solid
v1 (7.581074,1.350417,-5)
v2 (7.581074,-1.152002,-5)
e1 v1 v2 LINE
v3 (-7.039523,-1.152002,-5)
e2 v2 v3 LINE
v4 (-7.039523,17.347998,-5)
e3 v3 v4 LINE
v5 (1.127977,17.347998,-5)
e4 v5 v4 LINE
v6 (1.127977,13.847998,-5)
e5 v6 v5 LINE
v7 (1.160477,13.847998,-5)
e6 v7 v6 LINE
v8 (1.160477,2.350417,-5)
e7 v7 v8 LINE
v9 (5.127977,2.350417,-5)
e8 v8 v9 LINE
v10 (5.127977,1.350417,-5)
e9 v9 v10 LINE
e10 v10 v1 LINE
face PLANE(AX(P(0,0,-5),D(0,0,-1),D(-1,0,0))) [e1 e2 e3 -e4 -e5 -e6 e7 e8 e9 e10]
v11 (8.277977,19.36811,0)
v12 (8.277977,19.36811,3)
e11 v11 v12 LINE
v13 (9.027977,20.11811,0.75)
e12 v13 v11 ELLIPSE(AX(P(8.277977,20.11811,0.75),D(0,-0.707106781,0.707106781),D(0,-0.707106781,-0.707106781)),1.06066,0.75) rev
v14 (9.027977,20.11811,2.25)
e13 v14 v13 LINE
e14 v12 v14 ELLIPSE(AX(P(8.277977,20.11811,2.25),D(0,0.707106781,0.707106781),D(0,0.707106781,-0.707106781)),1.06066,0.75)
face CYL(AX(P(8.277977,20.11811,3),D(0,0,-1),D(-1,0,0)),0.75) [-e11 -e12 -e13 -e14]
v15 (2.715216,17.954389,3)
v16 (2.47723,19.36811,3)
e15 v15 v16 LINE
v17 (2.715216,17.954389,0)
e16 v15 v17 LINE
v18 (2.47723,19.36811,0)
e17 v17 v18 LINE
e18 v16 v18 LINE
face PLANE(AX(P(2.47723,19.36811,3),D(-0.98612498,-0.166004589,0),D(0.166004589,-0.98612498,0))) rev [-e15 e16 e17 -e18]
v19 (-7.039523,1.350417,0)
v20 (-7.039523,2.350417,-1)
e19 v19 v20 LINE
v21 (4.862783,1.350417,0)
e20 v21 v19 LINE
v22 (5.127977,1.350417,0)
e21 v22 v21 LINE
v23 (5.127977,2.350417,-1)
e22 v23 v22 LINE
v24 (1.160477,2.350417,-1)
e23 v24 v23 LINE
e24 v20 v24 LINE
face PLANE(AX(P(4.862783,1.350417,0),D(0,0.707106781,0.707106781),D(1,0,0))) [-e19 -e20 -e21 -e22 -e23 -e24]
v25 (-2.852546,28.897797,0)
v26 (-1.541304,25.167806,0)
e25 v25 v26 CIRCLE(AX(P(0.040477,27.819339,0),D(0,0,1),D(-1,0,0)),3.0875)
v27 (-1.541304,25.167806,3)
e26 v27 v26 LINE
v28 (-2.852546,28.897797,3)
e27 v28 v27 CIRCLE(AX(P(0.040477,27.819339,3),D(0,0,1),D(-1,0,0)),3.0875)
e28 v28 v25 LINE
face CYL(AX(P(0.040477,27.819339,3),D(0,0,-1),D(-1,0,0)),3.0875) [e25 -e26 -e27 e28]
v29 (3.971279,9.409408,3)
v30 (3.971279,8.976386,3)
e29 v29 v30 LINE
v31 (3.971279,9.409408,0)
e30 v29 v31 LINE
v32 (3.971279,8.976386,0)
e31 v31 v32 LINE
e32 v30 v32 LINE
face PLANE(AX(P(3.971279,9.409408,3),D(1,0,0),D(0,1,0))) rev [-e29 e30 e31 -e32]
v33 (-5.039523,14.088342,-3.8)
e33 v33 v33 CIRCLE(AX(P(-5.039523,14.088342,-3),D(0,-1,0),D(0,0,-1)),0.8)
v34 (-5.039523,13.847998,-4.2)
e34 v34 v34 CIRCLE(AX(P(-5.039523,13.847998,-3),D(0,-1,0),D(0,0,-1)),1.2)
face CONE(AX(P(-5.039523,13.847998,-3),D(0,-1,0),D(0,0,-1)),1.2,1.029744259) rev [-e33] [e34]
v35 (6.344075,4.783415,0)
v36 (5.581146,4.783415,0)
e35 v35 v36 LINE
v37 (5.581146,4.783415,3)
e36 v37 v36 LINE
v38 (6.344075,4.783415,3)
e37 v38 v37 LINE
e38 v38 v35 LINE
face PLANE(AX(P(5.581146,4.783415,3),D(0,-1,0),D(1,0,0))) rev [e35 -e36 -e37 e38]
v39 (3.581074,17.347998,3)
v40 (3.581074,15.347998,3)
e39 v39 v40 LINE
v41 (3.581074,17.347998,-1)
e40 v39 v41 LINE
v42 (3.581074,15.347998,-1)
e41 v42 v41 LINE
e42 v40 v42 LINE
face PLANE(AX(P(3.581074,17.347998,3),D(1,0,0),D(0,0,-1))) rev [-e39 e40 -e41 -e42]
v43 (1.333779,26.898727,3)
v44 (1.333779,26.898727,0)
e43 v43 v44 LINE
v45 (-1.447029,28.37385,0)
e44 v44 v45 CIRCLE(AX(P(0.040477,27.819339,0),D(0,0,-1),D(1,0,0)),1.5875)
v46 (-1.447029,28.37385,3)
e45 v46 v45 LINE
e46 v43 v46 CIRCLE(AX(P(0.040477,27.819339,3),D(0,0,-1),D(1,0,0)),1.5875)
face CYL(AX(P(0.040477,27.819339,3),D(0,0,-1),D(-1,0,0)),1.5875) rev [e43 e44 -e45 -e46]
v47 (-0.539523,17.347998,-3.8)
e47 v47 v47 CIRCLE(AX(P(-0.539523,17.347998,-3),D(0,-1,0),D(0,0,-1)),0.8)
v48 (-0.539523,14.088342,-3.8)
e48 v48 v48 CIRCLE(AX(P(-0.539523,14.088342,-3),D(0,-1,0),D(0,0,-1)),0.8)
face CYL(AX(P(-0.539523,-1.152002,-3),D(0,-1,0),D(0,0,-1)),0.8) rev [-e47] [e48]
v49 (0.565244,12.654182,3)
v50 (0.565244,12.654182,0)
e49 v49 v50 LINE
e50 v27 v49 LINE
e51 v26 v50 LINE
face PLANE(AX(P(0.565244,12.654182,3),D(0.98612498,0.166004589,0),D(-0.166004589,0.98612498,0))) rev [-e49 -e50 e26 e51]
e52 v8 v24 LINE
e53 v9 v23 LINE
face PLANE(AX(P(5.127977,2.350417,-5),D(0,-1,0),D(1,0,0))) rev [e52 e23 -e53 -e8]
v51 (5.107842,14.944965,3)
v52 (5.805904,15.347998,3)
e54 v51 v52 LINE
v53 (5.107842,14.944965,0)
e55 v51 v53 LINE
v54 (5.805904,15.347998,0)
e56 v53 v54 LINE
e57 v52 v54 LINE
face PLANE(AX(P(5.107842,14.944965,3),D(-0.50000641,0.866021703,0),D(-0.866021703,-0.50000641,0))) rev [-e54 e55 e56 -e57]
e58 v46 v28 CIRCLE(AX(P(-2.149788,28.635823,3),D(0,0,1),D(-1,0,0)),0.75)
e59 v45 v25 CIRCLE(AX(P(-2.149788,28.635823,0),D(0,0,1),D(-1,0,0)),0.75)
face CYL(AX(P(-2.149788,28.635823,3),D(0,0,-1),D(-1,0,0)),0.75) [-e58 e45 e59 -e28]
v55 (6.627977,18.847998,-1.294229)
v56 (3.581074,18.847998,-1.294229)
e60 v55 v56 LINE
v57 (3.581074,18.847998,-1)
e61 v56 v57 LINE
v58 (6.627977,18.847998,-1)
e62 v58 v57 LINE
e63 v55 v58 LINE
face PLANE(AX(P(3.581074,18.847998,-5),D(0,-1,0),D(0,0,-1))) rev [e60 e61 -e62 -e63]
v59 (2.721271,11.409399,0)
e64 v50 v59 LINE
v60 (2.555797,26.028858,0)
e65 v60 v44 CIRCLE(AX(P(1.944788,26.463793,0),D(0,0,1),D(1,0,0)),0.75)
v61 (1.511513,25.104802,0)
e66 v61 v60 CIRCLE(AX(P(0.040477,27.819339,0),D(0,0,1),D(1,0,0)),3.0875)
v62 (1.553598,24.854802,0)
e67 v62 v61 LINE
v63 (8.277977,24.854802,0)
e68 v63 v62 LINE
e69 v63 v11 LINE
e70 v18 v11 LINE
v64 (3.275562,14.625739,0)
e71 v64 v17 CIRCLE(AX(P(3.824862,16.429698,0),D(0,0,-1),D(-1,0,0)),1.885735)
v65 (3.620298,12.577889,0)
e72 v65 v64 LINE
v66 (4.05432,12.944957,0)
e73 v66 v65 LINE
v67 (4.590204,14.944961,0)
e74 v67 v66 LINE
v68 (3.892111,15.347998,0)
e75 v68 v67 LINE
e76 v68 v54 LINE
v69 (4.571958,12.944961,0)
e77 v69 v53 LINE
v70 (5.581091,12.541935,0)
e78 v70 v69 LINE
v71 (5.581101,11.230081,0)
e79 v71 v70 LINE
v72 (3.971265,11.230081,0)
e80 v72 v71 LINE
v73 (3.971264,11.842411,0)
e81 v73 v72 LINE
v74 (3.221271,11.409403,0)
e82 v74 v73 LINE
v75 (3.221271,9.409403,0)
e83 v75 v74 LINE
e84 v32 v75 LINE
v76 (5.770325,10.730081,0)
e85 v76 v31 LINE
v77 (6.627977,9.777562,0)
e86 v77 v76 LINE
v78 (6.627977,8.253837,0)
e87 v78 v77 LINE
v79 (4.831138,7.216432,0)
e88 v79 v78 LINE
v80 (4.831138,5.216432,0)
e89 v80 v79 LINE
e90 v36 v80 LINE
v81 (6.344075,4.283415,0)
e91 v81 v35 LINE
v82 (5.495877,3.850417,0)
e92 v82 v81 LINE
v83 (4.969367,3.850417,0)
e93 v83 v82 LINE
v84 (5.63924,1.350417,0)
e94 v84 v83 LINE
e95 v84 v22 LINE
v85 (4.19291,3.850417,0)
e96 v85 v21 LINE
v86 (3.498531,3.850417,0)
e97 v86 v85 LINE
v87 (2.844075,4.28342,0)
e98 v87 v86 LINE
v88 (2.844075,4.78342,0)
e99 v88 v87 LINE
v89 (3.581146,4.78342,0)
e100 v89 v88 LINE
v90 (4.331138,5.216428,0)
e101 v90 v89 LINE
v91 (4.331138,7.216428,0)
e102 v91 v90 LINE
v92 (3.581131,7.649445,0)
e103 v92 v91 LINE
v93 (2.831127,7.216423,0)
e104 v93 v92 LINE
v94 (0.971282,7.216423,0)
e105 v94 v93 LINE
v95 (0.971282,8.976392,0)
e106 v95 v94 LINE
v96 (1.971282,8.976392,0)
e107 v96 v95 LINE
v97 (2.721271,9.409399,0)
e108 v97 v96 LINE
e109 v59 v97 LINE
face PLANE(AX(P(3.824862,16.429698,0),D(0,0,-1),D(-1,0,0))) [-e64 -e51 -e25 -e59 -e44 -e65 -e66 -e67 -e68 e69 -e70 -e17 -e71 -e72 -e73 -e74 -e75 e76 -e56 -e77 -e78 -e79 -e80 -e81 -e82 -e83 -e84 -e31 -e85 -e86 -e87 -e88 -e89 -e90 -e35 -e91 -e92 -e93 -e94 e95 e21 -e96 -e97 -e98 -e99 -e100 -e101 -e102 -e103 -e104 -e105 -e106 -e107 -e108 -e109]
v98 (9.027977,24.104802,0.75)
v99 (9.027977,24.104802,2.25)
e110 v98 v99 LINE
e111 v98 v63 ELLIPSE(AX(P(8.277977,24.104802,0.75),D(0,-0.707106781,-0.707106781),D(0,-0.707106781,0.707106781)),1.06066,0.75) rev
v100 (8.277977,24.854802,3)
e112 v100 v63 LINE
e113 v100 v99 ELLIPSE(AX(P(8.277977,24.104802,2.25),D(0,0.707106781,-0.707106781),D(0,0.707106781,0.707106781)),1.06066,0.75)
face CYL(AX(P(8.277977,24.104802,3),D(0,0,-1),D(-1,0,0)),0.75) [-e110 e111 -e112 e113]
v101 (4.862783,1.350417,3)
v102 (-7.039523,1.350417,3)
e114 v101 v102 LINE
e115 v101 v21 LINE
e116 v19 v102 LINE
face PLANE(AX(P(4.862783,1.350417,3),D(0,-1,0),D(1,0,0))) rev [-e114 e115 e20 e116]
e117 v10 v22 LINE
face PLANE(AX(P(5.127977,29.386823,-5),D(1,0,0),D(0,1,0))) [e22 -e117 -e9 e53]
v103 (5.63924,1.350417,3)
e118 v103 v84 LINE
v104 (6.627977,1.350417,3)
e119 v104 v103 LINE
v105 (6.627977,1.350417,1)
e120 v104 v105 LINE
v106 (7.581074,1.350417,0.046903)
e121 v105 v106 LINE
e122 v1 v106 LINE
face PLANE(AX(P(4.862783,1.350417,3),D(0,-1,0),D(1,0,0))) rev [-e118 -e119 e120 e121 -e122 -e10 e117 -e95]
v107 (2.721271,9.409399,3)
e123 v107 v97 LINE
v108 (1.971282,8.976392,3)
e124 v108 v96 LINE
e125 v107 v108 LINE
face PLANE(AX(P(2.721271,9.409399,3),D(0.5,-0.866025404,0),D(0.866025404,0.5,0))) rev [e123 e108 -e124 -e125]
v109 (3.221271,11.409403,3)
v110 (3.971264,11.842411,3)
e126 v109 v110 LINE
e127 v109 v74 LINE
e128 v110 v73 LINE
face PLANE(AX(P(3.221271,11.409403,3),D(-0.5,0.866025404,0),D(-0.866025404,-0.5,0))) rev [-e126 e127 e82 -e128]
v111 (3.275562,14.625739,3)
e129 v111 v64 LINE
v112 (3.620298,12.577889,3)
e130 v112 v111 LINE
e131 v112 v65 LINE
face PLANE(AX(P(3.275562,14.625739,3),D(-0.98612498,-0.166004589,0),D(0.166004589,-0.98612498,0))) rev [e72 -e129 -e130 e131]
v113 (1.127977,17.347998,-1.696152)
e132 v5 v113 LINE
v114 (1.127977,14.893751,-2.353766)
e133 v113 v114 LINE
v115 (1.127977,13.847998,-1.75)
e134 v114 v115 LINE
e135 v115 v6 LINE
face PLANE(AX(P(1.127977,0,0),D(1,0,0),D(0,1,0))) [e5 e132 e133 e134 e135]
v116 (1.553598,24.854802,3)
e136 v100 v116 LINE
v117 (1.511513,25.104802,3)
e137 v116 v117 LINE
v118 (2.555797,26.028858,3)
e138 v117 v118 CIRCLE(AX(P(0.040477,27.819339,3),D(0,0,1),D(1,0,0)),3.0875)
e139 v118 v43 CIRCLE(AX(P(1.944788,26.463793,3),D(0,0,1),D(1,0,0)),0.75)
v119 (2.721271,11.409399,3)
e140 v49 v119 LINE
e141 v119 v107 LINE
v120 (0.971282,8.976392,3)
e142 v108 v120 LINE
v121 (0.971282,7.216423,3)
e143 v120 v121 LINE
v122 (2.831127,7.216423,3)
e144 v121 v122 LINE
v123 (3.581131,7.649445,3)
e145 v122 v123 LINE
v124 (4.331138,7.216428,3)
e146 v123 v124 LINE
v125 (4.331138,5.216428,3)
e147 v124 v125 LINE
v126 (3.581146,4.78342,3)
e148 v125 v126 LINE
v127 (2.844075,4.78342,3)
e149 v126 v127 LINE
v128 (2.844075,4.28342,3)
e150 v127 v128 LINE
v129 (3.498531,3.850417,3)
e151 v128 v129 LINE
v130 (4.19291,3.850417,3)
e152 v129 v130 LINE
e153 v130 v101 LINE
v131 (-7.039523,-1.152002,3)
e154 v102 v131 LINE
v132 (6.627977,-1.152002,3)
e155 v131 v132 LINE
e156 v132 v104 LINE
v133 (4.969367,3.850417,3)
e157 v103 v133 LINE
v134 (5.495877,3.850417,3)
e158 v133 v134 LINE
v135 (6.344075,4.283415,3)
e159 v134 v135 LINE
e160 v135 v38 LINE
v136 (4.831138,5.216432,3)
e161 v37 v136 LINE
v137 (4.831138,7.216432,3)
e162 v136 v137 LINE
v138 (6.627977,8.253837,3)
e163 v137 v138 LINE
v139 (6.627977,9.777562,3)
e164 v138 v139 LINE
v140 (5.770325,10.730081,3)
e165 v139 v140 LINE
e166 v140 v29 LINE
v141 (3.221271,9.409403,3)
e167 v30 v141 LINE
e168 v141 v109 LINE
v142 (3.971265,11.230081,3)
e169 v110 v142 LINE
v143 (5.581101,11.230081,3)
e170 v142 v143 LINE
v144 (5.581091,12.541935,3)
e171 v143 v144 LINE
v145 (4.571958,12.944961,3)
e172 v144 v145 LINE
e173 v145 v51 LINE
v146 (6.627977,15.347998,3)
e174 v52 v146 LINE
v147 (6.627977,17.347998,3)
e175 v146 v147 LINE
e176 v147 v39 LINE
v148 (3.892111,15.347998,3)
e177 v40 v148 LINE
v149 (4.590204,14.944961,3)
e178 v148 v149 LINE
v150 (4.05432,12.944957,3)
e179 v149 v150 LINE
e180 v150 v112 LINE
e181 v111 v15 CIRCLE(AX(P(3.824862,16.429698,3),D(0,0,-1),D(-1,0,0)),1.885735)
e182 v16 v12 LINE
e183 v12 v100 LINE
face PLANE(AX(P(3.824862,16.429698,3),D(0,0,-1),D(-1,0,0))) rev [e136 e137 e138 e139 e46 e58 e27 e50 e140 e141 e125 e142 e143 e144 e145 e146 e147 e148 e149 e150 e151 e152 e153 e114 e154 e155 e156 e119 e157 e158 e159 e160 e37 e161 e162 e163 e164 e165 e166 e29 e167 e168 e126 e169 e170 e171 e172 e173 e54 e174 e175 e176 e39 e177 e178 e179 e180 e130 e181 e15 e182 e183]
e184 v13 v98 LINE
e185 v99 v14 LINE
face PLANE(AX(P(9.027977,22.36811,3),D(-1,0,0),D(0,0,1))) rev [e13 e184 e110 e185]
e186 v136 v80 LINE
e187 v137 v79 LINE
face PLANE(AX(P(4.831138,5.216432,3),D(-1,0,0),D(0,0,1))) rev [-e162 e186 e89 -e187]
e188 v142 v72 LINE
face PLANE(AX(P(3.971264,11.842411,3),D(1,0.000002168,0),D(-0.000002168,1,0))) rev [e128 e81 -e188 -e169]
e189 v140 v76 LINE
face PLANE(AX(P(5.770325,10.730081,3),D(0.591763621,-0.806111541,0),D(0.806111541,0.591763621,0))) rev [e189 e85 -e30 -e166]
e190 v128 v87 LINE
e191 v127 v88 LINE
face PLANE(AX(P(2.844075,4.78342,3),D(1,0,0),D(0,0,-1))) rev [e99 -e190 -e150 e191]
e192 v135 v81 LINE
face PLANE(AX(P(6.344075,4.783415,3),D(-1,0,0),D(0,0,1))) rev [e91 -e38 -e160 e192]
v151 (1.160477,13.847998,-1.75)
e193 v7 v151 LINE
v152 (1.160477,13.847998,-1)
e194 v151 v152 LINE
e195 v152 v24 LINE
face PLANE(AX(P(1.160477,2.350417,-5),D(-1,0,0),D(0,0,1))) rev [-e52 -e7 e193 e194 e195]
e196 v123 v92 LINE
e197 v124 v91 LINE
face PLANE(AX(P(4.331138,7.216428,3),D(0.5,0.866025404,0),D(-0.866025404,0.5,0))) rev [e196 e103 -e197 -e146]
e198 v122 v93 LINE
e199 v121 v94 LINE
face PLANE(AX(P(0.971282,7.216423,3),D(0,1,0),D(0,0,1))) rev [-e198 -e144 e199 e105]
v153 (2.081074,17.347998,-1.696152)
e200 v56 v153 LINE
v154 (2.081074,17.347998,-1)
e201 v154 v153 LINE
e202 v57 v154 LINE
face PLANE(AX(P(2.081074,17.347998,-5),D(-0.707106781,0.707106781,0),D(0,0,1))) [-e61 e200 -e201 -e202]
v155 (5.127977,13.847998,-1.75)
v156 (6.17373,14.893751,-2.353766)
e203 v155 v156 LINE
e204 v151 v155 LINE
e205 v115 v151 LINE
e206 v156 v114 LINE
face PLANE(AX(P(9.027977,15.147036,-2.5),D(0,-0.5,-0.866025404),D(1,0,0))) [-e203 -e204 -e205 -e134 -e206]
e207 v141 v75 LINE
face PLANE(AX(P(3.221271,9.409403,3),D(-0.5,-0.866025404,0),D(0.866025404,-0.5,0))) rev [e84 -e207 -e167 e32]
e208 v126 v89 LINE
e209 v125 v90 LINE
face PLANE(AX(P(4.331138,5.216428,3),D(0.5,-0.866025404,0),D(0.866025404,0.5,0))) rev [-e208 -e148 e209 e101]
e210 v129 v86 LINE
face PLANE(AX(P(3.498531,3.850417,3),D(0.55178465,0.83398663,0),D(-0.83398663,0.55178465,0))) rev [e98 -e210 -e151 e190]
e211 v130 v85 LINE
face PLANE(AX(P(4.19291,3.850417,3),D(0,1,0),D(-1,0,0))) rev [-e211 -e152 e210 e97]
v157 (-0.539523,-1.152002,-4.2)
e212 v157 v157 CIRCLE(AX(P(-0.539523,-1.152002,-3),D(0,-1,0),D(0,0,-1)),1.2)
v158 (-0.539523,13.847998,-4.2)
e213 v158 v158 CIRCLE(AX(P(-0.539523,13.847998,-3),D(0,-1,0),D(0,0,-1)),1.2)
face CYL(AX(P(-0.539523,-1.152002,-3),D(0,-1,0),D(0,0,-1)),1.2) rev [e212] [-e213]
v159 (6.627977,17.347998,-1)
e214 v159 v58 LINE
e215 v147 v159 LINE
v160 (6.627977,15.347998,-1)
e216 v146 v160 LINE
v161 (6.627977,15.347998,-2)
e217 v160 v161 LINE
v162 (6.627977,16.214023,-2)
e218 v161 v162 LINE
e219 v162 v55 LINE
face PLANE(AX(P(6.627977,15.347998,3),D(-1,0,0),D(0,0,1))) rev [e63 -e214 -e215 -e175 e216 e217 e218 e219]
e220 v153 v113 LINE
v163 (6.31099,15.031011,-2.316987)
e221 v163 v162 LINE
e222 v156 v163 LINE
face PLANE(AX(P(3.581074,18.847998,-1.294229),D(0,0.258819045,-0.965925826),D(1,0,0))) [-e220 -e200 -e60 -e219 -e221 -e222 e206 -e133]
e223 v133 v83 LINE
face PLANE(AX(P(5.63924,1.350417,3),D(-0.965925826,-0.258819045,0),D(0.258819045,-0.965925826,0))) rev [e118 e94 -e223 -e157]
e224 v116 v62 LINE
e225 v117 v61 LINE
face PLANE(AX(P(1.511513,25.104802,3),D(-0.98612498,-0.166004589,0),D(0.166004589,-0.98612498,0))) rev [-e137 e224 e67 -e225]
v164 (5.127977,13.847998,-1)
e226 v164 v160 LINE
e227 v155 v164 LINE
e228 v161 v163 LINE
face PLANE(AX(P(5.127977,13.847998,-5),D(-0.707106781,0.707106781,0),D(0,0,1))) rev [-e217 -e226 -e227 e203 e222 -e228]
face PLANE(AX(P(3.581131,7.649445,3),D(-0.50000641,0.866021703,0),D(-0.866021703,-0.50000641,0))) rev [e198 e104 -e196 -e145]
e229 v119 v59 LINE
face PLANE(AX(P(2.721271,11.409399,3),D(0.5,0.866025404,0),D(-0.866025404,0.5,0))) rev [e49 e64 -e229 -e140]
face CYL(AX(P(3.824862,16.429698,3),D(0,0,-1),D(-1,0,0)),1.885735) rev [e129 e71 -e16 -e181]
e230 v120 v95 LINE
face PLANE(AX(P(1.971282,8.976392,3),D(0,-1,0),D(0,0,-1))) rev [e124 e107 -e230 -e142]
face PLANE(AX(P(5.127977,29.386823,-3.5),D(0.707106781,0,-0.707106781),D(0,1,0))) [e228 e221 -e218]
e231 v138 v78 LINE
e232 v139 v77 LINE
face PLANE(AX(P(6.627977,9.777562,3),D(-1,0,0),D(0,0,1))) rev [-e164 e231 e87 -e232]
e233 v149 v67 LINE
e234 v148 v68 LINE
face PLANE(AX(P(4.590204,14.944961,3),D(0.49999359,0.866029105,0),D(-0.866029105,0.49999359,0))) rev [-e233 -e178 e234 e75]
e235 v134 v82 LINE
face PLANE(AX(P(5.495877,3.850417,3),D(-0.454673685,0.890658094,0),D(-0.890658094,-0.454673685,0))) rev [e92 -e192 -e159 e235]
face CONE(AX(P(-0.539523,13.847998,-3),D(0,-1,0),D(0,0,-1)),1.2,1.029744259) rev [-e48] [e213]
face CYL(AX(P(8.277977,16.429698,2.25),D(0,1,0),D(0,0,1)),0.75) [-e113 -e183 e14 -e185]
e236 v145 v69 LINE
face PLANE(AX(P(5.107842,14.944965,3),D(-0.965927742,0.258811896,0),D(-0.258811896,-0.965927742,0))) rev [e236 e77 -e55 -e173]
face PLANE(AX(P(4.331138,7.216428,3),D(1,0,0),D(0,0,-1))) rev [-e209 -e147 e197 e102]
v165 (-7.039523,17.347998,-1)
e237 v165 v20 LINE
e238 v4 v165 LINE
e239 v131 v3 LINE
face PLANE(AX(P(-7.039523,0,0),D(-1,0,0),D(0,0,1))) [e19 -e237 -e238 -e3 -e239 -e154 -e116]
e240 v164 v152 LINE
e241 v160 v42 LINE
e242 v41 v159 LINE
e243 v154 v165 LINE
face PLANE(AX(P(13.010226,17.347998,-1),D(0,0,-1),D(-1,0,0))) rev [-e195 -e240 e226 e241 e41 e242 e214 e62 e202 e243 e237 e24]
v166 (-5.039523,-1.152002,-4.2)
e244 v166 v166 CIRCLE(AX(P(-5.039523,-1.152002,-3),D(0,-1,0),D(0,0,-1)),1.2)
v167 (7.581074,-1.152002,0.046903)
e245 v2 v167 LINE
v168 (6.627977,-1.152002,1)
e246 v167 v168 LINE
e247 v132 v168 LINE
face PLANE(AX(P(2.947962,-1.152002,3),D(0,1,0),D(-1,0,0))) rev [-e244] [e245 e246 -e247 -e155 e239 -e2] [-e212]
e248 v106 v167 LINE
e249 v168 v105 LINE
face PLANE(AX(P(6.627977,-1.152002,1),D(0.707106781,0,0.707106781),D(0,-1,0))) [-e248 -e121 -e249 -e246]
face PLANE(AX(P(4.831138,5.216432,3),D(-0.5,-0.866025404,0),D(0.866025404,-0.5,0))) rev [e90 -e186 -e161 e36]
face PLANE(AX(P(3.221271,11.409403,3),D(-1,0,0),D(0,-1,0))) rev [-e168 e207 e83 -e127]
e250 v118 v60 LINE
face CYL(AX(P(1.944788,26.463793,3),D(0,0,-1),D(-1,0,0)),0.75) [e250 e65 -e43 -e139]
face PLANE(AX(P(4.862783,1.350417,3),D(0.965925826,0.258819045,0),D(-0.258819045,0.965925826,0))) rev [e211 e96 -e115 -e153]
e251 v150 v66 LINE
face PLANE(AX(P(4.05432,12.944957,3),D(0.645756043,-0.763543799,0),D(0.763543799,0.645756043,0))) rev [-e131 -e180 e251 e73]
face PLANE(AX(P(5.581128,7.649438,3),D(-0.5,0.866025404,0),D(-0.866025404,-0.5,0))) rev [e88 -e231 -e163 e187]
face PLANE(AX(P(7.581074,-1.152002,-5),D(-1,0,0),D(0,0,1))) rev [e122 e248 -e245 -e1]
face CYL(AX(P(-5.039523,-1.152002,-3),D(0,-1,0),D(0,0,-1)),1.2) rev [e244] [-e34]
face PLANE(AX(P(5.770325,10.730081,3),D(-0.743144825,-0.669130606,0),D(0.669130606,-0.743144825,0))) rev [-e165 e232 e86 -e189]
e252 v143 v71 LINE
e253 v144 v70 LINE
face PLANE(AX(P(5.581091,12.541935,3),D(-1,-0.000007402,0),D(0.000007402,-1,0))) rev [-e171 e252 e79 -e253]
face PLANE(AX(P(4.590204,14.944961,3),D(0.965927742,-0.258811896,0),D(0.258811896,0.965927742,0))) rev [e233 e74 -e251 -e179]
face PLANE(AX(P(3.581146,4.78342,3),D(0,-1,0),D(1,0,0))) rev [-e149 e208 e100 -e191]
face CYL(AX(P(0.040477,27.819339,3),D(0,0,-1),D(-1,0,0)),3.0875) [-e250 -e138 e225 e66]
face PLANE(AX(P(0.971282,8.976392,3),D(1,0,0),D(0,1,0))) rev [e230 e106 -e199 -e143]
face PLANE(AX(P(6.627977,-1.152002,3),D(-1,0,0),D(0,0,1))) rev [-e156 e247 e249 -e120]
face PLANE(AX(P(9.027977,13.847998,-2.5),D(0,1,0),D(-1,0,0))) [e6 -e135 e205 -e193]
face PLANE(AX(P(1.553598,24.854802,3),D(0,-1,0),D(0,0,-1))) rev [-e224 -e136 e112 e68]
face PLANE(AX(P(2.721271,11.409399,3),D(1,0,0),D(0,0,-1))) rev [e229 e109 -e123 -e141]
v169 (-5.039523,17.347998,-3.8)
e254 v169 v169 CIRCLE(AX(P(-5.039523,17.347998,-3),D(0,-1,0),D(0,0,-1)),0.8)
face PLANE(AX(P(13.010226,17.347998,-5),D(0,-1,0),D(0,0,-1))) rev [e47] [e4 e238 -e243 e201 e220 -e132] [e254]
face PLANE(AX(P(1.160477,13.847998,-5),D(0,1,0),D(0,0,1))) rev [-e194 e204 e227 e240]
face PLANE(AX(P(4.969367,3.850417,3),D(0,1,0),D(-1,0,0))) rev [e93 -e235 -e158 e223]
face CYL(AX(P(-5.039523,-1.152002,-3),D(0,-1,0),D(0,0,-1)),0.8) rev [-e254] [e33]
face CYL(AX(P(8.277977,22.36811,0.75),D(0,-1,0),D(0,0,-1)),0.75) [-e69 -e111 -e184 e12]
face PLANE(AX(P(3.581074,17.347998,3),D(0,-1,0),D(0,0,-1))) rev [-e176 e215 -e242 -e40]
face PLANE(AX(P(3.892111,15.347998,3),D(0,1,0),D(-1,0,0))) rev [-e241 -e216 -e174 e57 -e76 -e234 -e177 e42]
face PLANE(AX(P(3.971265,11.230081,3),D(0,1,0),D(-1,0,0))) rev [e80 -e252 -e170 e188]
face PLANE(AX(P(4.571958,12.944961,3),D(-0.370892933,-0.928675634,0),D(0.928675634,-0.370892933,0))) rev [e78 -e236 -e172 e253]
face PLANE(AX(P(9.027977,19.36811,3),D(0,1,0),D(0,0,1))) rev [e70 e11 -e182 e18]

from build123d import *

# Parameters (mm, degrees)
BOSS_SWITCH_BODY_DEPTH                    = 3
SKETCH1_W                                 = 4
SKETCH1_H                                 = 3.5
BOSS_FLANGE_WIDTH_DEPTH                   = 5
BOSS_FLANGE_HEIGHT_REACH                  = 35.863
SKETCH2_W                                 = 4
SKETCH2_H                                 = 2
SKETCH2_W_2                               = 8
SKETCH2_H_2                               = 2.502418954
CUT_UP_TO_DOWN_DERAILLEUR_CLEARANCE_REACH = 21.462
SKETCH10_W                                = 2.453096586
SKETCH10_H                                = 3
SKETCH17_W                                = 12.1675
SKETCH17_H                                = 4
BOSS_FLANGE_SUPPORT_DEPTH                 = 13.997581047
TAP_DRILL_FOR_M2X0_4_TAP1_D               = 1.6
M2_CLEARANCE_HOLE2_D                      = 2.4
M2_CLEARANCE_HOLE2_DEPTH                  = 15
M2_CLEARANCE_HOLE2_TIP                    = 0.721032743
CHAMFER_FLANGE_SUPPORT_SIZE               = 1.5
CHAMFER_FLANGE_SUPPORT_2_SIZE             = 1.5
CHAMFER_FLANGE_SUPPORT_3_SIZE             = 1
SKETCH23_W                                = 3.9675
SKETCH23_H                                = 11.497581046
CUT_GAP_FOR_PRINTING_DEPTH                = 32.000499688
SKETCH25_W                                = 0.953096586
SKETCH25_H                                = 3.5
CUT_DERAILLEUR_CLEARANCE_DEPTH            = 32.145320369
CHAMFER8_SIZE                             = 1
CUT_WIDE_DERAILLEUR_CLEARANCE_DEPTH       = 33.195879702
CUT_WIDE_DERAILLEUR_CLEARANCE_DEPTH_BACK  = 4
SKETCH27_W                                = 2.5
SKETCH27_H                                = 5
CHAMFER9_SIZE                             = 4.5
CHAMFER9_SIZE2                            = 1.205771366
SKETCH28_W                                = 3.046903414
SKETCH28_H                                = 1.5
CUT_EXTRUDE1_DEPTH                        = 1
FILLET1_R                                 = 0.75
CHAMFER10_SIZE                            = 0.75
CHAMFER10_SIZE_2                          = 1.299038106


# Some blends are built 0.0001 mm under size
with BuildPart() as part:
    # Sketch-SwitchBossUp → Boss-Switch Body (new body)
    with BuildSketch(Plane.XY):
        with BuildLine():
            Line((5.581091299, 12.541934627), (5.581101009, 11.23008127))
            Line((5.581101009, 11.23008127), (3.971265267, 11.23008127))
            Line((3.971265267, 11.23008127), (3.97126394, 11.842410935))
            Line((3.97126394, 11.842410935), (3.221271341, 11.409402506))
            Line((3.221271341, 11.409402506), (3.221271341, 9.409402506))
            Line((3.221271341, 9.409402506), (3.971278743, 8.976385531))
            Line((3.971278743, 8.976385531), (3.971278743, 9.409408058))
            Line((3.971278743, 9.409408058), (5.770324648, 10.73008127))
            Line((5.770324648, 10.73008127), (6.627976927, 9.777561915))
            Line((6.627976927, 9.777561915), (6.627976927, 8.253837221))
            Line((6.627976927, 8.253837221), (5.581127512, 7.649438429))
            Line((5.581127512, 7.649438429), (4.831138119, 7.216431851))
            Line((4.831138119, 7.216431851), (4.831138119, 5.216431851))
            Line((4.831138119, 5.216431851), (5.58114552, 4.783414875))
            Line((5.58114552, 4.783414875), (6.344074933, 4.783414875))
            Line((6.344074933, 4.783414875), (6.344074933, 4.283414875))
            Line((6.344074933, 4.283414875), (5.495877173, 3.850416844))
            Line((5.495877173, 3.850416844), (4.969366686, 3.850416844))
            Line((4.969366686, 3.850416844), (5.639239667, 1.350416844))
            Line((5.639239667, 1.350416844), (6.627976927, 1.350416844))
            Line((6.627976927, 1.350416844), (6.627976927, -1.15200211))
            Line((6.627976927, -1.15200211), (2.947962105, -1.15200211))
            Line((2.947962105, -1.15200211), (2.947962105, 1.350416844))
            Line((2.947962105, 1.350416844), (4.862782532, 1.350416844))
            Line((4.862782532, 1.350416844), (4.192909551, 3.850416844))
            Line((4.192909551, 3.850416844), (3.498530635, 3.850416844))
            Line((3.498530635, 3.850416844), (2.844074933, 4.283419721))
            Line((2.844074933, 4.283419721), (2.844074933, 4.783419721))
            Line((2.844074933, 4.783419721), (3.58114552, 4.783419721))
            Line((3.58114552, 4.783419721), (4.331138119, 5.21642815))
            Line((4.331138119, 5.21642815), (4.331138119, 7.21642815))
            Line((4.331138119, 7.21642815), (3.581130717, 7.649445125))
            Line((3.581130717, 7.649445125), (2.83112652, 7.216422599))
            Line((2.83112652, 7.216422599), (0.971281948, 7.216422599))
            Line((0.971281948, 7.216422599), (0.971281948, 8.976392227))
            Line((0.971281948, 8.976392227), (1.971281948, 8.976392227))
            Line((1.971281948, 8.976392227), (2.721271341, 9.409398805))
            Line((2.721271341, 9.409398805), (2.721271341, 11.409398805))
            Line((2.721271341, 11.409398805), (1.688483029, 12.005679416))
            Line((1.688483029, 12.005679416), (0.565243661, 12.654181967))
            Line((0.565243661, 12.654181967), (-1.541303694, 25.167805745))
            ThreePointArc((-1.541303694, 25.167805745), (-2.872284003, 26.795385437), (-2.852546321, 28.897797067))
            ThreePointArc((-2.852546321, 28.897797067), (-1.887813913, 29.338582026), (-1.447028953, 28.373849618))
            ThreePointArc((-1.447028953, 28.373849618), (-0.703448682, 26.416936722), (1.333779254, 26.898727173))
            ThreePointArc((1.333779254, 26.898727173), (2.379722745, 27.074801628), (2.555797201, 26.028858137))
            ThreePointArc((2.555797201, 26.028858137), (2.086504637, 25.507104397), (1.511513111, 25.104801997))
            Line((1.511513111, 25.104801997), (1.553598189, 24.854801997))
            Line((1.553598189, 24.854801997), (9.027976927, 24.854801997))
            Line((9.027976927, 24.854801997), (9.027976927, 22.368110011))
            Line((9.027976927, 22.368110011), (9.027976927, 19.368110011))
            Line((9.027976927, 19.368110011), (2.477229641, 19.368110011))
            Line((2.477229641, 19.368110011), (2.715215909, 17.954388823))
            ThreePointArc((2.715215909, 17.954388823), (1.96529156, 16.116657159), (3.275561815, 14.625739302))
            Line((3.275561815, 14.625739302), (3.620297651, 12.577888564))
            Line((3.620297651, 12.577888564), (4.054320079, 12.944956709))
            Line((4.054320079, 12.944956709), (4.59020366, 14.944960676))
            Line((4.59020366, 14.944960676), (3.892110795, 15.34799789))
            Line((3.892110795, 15.34799789), (3.581073513, 15.34799789))
            Line((3.581073513, 15.34799789), (3.581073513, 17.34799789))
            Line((3.581073513, 17.34799789), (5.639078341, 17.34799789))
            Line((5.639078341, 17.34799789), (6.627976927, 17.34799789))
            Line((6.627976927, 17.34799789), (6.627976927, 15.34799789))
            Line((6.627976927, 15.34799789), (5.805904115, 15.34799789))
            Line((5.805904115, 15.34799789), (5.107841751, 14.944964507))
            Line((5.107841751, 14.944964507), (4.571958169, 12.944960541))
            Line((4.571958169, 12.944960541), (5.581091299, 12.541934627))
        make_face()
    extrude(amount=BOSS_SWITCH_BODY_DEPTH)

    # Sketch1 → Boss-Flange Width (add)
    with BuildSketch(Plane(origin=(0, 0, 0), x_dir=(-1, 0, 0), z_dir=(0, 0, -1))):
        Polygon((-7.581073513, -1.15200211), (0.412170615, -1.15200211), (0.412170615, 1.350416844), (-2.947962105, 1.350416844), (-4.862782532, 1.350416844), (-5.639239667, 1.350416844), (-6.627976927, 1.350416844), (-7.581073513, 1.350416844), align=None)
        with Locations((-5.581073513, 17.09799789)):
            Rectangle(SKETCH1_W, SKETCH1_H)
    extrude(amount=BOSS_FLANGE_WIDTH_DEPTH)

    # Sketch2 → Boss-Flange Height (add, up to next)
    with BuildSketch(Plane(origin=(-7.039523073, 0, 0), x_dir=(0, 0, -1), z_dir=(1, 0, 0)), mode=Mode.PRIVATE) as boss_flange_height_sk1:
        with Locations((3, 16.34799789)):
            Rectangle(SKETCH2_W, SKETCH2_H)
    boss_flange_height_tool1 = extrude(boss_flange_height_sk1.sketch, amount=BOSS_FLANGE_HEIGHT_REACH, mode=Mode.PRIVATE) - part.part
    # Sketch2 → Boss-Flange Height (add, up to next)
    with BuildSketch(Plane(origin=(-7.039523073, 0, 0), x_dir=(0, 0, -1), z_dir=(1, 0, 0)), mode=Mode.PRIVATE) as boss_flange_height_sk2:
        with Locations((1, 0.099207367)):
            Rectangle(SKETCH2_W_2, SKETCH2_H_2)
    boss_flange_height_tool2 = extrude(boss_flange_height_sk2.sketch, amount=BOSS_FLANGE_HEIGHT_REACH, mode=Mode.PRIVATE) - part.part
    add(boss_flange_height_tool1.solids().sort_by_distance((-7.039523, 16.347998, -3))[0])
    add(boss_flange_height_tool2.solids().sort_by_distance((-7.039523, 0.099207, -1))[0])

    # Sketch10 → Cut-Up-To-Down Derailleur Clearance (cut, up to next)
    with BuildSketch(Plane(origin=(0, 15.34799789, 0), x_dir=(1, 0, 0), z_dir=(0, 1, 0)), mode=Mode.PRIVATE) as cut_up_to_down_derailleur_clearance_sk1:
        with Locations((6.35452522, 3.5)):
            Rectangle(SKETCH10_W, SKETCH10_H)
    cut_up_to_down_derailleur_clearance_tool1 = extrude(cut_up_to_down_derailleur_clearance_sk1.sketch, amount=CUT_UP_TO_DOWN_DERAILLEUR_CLEARANCE_REACH, mode=Mode.PRIVATE) & part.part
    add(cut_up_to_down_derailleur_clearance_tool1.solids().sort_by_distance((6.354525, 15.347998, -3.5))[0], mode=Mode.SUBTRACT)

    # Sketch17 → Boss-Flange Support (add)
    with BuildSketch(Plane.XZ.offset(-15.34799789)):
        with Locations((-0.955773073, -3)):
            Rectangle(SKETCH17_W, SKETCH17_H)
    extrude(amount=BOSS_FLANGE_SUPPORT_DEPTH)

    # Tap Drill for M2x0.4 Tap1 (through all)
    with Locations(Plane(origin=(0, -1.15200211, 0), x_dir=(-1, 0, 0), z_dir=(0, -1, 0))):
        with Locations((5.039523073, 3), (0.539523073, 3)):
            Hole(TAP_DRILL_FOR_M2X0_4_TAP1_D / 2)

    # M2 Clearance Hole2
    with Locations(Plane.XZ.offset(1.15200211)):
        with Locations((-5.039523073, -3), (-0.539523073, -3)):
            Hole(M2_CLEARANCE_HOLE2_D / 2, depth=M2_CLEARANCE_HOLE2_DEPTH)
            with Locations((0, 0, -(M2_CLEARANCE_HOLE2_DEPTH + M2_CLEARANCE_HOLE2_TIP / 2))):  # 118° drill point
                Cone(0, M2_CLEARANCE_HOLE2_D / 2, M2_CLEARANCE_HOLE2_TIP, mode=Mode.SUBTRACT)

    # Chamfer-Flange Support
    chamfer_flange_support_edges = [part.edges().sort_by_distance(p)[0] for p in [
        (3.581073513, 17.34799789, -3),
    ]]
    chamfer(chamfer_flange_support_edges, length=CHAMFER_FLANGE_SUPPORT_SIZE - 0.0001)  # a hair under: the kernel refuses the full size

    # Chamfer-Flange Support 2
    chamfer_flange_support_2_edges = [part.edges().sort_by_distance(p)[0] for p in [
        (5.127976927, 17.09799789, -2),
        (5.127976927, 15.34799789, -1.5),
    ]]
    chamfer(chamfer_flange_support_2_edges, length=CHAMFER_FLANGE_SUPPORT_2_SIZE)

    # Chamfer-Flange Support 3
    chamfer_flange_support_3_edges = [part.edges().sort_by_distance(p)[0] for p in [
        (-0.955773073, 1.350416843, -1),
    ]]
    chamfer(chamfer_flange_support_3_edges, length=CHAMFER_FLANGE_SUPPORT_3_SIZE - 0.0001)  # a hair under: the kernel refuses the full size

    # Sketch23 → Cut-Gap for Printing (cut, through all)
    with BuildSketch(Plane.XY.offset(-1)):
        with Locations((3.144226927, 8.099207367)):
            Rectangle(SKETCH23_W, SKETCH23_H)
    extrude(amount=-CUT_GAP_FOR_PRINTING_DEPTH, mode=Mode.SUBTRACT)

    # Sketch25 → Cut-Derailleur Clearance (cut, through all)
    with BuildSketch(Plane.XY):
        with Locations((7.10452522, 17.09799789)):
            Rectangle(SKETCH25_W, SKETCH25_H)
    extrude(amount=-CUT_DERAILLEUR_CLEARANCE_DEPTH, mode=Mode.SUBTRACT)

    # Chamfer8
    # the kernel refuses this chamfer: 1 mm, written as the material it adds along each edge
    with BuildSketch(Plane(origin=(6.627976927, 1.350416844, 0), x_dir=(0.9996219169112968, 0, -0.027495876610586365), z_dir=(0, -1, 0))) as chamfer8_piece_1_section:
        Polygon((CHAMFER8_SIZE * 0.999621916911, CHAMFER8_SIZE * 0.0274958766106), (-CHAMFER8_SIZE * 0.0274958766106, CHAMFER8_SIZE * 0.999621916911), (0, 0), align=None)
    chamfer8_piece_1 = extrude(amount=2.502418953, mode=Mode.PRIVATE)
    chamfer8_piece_1 = split(chamfer8_piece_1, bisect_by=Plane(origin=(7.581073513, 0.099207367, 0.332375145), z_dir=(-1, 0, 0)), keep=Keep.TOP, mode=Mode.PRIVATE)
    add(chamfer8_piece_1)

    # Sketch27 → Cut-Wide Derailleur Clearance (cut, two sides: drawn at the far end of the back side and taken through both)
    with BuildSketch(Plane(origin=(5.127976927, 0, 0), x_dir=(0, 0, -1), z_dir=(1, 0, 0)).offset(-CUT_WIDE_DERAILLEUR_CLEARANCE_DEPTH_BACK)):
        with Locations((3.75, 16.34799789)):
            Rectangle(SKETCH27_W, SKETCH27_H)
    extrude(amount=CUT_WIDE_DERAILLEUR_CLEARANCE_DEPTH + CUT_WIDE_DERAILLEUR_CLEARANCE_DEPTH_BACK, mode=Mode.SUBTRACT)

    # Chamfer9
    chamfer9_edges = [part.edges().sort_by_distance(p)[0] for p in [
        (4.85452522, 18.84799789, -2.5),
    ]]
    chamfer9_side = [part.faces().sort_by_distance(p)[0] for p in [
        (3.764105521, 16.180817512, -2.5),
    ]]
    chamfer(chamfer9_edges, length=CHAMFER9_SIZE, length2=CHAMFER9_SIZE2, reference=chamfer9_side[0])

    # Sketch28 → Cut-Extrude1 (cut)
    with BuildSketch(Plane.XY.offset(-1)):
        with Locations((5.10452522, 18.09799789)):
            Rectangle(SKETCH28_W, SKETCH28_H)
    extrude(amount=CUT_EXTRUDE1_DEPTH, mode=Mode.SUBTRACT)

    # Fillet1
    fillet1_edges = [part.edges().sort_by_distance(p)[0] for p in [
        (9.027976927, 24.854801997, 1.5),
        (9.027976927, 19.368110011, 1.5),
        (9.027976927, 22.111456004, 3),
        (9.027976927, 22.111456004, 0),
    ]]
    fillet(fillet1_edges, radius=FILLET1_R)

    # Chamfer10
    # the kernel refuses this chamfer: 1.299038106, 0.75 mm, written as the material it takes off along each edge
    with BuildSketch(Plane(origin=(-2.200246051, 13.84799789, -2.5), x_dir=(0, -0.0578938624026709, 0.9983227437537926), z_dir=(1, 0, 0))) as chamfer10_piece_1_section:
        Polygon((CHAMFER10_SIZE * 0.998322743754, -CHAMFER10_SIZE * 0.0578938624027), (-CHAMFER10_SIZE_2 * 0.0578938623883, -CHAMFER10_SIZE_2 * 0.998322743505), (0, 0), align=None)
    chamfer10_piece_1 = extrude(amount=10.688945956, mode=Mode.PRIVATE)
    chamfer10_piece_1 = split(chamfer10_piece_1, bisect_by=Plane(origin=(1.127976927, 14.210794695, -2.222573912), z_dir=(1, 0, 0)), keep=Keep.TOP, mode=Mode.PRIVATE)
    add(chamfer10_piece_1, mode=Mode.SUBTRACT)


solid = part.part
